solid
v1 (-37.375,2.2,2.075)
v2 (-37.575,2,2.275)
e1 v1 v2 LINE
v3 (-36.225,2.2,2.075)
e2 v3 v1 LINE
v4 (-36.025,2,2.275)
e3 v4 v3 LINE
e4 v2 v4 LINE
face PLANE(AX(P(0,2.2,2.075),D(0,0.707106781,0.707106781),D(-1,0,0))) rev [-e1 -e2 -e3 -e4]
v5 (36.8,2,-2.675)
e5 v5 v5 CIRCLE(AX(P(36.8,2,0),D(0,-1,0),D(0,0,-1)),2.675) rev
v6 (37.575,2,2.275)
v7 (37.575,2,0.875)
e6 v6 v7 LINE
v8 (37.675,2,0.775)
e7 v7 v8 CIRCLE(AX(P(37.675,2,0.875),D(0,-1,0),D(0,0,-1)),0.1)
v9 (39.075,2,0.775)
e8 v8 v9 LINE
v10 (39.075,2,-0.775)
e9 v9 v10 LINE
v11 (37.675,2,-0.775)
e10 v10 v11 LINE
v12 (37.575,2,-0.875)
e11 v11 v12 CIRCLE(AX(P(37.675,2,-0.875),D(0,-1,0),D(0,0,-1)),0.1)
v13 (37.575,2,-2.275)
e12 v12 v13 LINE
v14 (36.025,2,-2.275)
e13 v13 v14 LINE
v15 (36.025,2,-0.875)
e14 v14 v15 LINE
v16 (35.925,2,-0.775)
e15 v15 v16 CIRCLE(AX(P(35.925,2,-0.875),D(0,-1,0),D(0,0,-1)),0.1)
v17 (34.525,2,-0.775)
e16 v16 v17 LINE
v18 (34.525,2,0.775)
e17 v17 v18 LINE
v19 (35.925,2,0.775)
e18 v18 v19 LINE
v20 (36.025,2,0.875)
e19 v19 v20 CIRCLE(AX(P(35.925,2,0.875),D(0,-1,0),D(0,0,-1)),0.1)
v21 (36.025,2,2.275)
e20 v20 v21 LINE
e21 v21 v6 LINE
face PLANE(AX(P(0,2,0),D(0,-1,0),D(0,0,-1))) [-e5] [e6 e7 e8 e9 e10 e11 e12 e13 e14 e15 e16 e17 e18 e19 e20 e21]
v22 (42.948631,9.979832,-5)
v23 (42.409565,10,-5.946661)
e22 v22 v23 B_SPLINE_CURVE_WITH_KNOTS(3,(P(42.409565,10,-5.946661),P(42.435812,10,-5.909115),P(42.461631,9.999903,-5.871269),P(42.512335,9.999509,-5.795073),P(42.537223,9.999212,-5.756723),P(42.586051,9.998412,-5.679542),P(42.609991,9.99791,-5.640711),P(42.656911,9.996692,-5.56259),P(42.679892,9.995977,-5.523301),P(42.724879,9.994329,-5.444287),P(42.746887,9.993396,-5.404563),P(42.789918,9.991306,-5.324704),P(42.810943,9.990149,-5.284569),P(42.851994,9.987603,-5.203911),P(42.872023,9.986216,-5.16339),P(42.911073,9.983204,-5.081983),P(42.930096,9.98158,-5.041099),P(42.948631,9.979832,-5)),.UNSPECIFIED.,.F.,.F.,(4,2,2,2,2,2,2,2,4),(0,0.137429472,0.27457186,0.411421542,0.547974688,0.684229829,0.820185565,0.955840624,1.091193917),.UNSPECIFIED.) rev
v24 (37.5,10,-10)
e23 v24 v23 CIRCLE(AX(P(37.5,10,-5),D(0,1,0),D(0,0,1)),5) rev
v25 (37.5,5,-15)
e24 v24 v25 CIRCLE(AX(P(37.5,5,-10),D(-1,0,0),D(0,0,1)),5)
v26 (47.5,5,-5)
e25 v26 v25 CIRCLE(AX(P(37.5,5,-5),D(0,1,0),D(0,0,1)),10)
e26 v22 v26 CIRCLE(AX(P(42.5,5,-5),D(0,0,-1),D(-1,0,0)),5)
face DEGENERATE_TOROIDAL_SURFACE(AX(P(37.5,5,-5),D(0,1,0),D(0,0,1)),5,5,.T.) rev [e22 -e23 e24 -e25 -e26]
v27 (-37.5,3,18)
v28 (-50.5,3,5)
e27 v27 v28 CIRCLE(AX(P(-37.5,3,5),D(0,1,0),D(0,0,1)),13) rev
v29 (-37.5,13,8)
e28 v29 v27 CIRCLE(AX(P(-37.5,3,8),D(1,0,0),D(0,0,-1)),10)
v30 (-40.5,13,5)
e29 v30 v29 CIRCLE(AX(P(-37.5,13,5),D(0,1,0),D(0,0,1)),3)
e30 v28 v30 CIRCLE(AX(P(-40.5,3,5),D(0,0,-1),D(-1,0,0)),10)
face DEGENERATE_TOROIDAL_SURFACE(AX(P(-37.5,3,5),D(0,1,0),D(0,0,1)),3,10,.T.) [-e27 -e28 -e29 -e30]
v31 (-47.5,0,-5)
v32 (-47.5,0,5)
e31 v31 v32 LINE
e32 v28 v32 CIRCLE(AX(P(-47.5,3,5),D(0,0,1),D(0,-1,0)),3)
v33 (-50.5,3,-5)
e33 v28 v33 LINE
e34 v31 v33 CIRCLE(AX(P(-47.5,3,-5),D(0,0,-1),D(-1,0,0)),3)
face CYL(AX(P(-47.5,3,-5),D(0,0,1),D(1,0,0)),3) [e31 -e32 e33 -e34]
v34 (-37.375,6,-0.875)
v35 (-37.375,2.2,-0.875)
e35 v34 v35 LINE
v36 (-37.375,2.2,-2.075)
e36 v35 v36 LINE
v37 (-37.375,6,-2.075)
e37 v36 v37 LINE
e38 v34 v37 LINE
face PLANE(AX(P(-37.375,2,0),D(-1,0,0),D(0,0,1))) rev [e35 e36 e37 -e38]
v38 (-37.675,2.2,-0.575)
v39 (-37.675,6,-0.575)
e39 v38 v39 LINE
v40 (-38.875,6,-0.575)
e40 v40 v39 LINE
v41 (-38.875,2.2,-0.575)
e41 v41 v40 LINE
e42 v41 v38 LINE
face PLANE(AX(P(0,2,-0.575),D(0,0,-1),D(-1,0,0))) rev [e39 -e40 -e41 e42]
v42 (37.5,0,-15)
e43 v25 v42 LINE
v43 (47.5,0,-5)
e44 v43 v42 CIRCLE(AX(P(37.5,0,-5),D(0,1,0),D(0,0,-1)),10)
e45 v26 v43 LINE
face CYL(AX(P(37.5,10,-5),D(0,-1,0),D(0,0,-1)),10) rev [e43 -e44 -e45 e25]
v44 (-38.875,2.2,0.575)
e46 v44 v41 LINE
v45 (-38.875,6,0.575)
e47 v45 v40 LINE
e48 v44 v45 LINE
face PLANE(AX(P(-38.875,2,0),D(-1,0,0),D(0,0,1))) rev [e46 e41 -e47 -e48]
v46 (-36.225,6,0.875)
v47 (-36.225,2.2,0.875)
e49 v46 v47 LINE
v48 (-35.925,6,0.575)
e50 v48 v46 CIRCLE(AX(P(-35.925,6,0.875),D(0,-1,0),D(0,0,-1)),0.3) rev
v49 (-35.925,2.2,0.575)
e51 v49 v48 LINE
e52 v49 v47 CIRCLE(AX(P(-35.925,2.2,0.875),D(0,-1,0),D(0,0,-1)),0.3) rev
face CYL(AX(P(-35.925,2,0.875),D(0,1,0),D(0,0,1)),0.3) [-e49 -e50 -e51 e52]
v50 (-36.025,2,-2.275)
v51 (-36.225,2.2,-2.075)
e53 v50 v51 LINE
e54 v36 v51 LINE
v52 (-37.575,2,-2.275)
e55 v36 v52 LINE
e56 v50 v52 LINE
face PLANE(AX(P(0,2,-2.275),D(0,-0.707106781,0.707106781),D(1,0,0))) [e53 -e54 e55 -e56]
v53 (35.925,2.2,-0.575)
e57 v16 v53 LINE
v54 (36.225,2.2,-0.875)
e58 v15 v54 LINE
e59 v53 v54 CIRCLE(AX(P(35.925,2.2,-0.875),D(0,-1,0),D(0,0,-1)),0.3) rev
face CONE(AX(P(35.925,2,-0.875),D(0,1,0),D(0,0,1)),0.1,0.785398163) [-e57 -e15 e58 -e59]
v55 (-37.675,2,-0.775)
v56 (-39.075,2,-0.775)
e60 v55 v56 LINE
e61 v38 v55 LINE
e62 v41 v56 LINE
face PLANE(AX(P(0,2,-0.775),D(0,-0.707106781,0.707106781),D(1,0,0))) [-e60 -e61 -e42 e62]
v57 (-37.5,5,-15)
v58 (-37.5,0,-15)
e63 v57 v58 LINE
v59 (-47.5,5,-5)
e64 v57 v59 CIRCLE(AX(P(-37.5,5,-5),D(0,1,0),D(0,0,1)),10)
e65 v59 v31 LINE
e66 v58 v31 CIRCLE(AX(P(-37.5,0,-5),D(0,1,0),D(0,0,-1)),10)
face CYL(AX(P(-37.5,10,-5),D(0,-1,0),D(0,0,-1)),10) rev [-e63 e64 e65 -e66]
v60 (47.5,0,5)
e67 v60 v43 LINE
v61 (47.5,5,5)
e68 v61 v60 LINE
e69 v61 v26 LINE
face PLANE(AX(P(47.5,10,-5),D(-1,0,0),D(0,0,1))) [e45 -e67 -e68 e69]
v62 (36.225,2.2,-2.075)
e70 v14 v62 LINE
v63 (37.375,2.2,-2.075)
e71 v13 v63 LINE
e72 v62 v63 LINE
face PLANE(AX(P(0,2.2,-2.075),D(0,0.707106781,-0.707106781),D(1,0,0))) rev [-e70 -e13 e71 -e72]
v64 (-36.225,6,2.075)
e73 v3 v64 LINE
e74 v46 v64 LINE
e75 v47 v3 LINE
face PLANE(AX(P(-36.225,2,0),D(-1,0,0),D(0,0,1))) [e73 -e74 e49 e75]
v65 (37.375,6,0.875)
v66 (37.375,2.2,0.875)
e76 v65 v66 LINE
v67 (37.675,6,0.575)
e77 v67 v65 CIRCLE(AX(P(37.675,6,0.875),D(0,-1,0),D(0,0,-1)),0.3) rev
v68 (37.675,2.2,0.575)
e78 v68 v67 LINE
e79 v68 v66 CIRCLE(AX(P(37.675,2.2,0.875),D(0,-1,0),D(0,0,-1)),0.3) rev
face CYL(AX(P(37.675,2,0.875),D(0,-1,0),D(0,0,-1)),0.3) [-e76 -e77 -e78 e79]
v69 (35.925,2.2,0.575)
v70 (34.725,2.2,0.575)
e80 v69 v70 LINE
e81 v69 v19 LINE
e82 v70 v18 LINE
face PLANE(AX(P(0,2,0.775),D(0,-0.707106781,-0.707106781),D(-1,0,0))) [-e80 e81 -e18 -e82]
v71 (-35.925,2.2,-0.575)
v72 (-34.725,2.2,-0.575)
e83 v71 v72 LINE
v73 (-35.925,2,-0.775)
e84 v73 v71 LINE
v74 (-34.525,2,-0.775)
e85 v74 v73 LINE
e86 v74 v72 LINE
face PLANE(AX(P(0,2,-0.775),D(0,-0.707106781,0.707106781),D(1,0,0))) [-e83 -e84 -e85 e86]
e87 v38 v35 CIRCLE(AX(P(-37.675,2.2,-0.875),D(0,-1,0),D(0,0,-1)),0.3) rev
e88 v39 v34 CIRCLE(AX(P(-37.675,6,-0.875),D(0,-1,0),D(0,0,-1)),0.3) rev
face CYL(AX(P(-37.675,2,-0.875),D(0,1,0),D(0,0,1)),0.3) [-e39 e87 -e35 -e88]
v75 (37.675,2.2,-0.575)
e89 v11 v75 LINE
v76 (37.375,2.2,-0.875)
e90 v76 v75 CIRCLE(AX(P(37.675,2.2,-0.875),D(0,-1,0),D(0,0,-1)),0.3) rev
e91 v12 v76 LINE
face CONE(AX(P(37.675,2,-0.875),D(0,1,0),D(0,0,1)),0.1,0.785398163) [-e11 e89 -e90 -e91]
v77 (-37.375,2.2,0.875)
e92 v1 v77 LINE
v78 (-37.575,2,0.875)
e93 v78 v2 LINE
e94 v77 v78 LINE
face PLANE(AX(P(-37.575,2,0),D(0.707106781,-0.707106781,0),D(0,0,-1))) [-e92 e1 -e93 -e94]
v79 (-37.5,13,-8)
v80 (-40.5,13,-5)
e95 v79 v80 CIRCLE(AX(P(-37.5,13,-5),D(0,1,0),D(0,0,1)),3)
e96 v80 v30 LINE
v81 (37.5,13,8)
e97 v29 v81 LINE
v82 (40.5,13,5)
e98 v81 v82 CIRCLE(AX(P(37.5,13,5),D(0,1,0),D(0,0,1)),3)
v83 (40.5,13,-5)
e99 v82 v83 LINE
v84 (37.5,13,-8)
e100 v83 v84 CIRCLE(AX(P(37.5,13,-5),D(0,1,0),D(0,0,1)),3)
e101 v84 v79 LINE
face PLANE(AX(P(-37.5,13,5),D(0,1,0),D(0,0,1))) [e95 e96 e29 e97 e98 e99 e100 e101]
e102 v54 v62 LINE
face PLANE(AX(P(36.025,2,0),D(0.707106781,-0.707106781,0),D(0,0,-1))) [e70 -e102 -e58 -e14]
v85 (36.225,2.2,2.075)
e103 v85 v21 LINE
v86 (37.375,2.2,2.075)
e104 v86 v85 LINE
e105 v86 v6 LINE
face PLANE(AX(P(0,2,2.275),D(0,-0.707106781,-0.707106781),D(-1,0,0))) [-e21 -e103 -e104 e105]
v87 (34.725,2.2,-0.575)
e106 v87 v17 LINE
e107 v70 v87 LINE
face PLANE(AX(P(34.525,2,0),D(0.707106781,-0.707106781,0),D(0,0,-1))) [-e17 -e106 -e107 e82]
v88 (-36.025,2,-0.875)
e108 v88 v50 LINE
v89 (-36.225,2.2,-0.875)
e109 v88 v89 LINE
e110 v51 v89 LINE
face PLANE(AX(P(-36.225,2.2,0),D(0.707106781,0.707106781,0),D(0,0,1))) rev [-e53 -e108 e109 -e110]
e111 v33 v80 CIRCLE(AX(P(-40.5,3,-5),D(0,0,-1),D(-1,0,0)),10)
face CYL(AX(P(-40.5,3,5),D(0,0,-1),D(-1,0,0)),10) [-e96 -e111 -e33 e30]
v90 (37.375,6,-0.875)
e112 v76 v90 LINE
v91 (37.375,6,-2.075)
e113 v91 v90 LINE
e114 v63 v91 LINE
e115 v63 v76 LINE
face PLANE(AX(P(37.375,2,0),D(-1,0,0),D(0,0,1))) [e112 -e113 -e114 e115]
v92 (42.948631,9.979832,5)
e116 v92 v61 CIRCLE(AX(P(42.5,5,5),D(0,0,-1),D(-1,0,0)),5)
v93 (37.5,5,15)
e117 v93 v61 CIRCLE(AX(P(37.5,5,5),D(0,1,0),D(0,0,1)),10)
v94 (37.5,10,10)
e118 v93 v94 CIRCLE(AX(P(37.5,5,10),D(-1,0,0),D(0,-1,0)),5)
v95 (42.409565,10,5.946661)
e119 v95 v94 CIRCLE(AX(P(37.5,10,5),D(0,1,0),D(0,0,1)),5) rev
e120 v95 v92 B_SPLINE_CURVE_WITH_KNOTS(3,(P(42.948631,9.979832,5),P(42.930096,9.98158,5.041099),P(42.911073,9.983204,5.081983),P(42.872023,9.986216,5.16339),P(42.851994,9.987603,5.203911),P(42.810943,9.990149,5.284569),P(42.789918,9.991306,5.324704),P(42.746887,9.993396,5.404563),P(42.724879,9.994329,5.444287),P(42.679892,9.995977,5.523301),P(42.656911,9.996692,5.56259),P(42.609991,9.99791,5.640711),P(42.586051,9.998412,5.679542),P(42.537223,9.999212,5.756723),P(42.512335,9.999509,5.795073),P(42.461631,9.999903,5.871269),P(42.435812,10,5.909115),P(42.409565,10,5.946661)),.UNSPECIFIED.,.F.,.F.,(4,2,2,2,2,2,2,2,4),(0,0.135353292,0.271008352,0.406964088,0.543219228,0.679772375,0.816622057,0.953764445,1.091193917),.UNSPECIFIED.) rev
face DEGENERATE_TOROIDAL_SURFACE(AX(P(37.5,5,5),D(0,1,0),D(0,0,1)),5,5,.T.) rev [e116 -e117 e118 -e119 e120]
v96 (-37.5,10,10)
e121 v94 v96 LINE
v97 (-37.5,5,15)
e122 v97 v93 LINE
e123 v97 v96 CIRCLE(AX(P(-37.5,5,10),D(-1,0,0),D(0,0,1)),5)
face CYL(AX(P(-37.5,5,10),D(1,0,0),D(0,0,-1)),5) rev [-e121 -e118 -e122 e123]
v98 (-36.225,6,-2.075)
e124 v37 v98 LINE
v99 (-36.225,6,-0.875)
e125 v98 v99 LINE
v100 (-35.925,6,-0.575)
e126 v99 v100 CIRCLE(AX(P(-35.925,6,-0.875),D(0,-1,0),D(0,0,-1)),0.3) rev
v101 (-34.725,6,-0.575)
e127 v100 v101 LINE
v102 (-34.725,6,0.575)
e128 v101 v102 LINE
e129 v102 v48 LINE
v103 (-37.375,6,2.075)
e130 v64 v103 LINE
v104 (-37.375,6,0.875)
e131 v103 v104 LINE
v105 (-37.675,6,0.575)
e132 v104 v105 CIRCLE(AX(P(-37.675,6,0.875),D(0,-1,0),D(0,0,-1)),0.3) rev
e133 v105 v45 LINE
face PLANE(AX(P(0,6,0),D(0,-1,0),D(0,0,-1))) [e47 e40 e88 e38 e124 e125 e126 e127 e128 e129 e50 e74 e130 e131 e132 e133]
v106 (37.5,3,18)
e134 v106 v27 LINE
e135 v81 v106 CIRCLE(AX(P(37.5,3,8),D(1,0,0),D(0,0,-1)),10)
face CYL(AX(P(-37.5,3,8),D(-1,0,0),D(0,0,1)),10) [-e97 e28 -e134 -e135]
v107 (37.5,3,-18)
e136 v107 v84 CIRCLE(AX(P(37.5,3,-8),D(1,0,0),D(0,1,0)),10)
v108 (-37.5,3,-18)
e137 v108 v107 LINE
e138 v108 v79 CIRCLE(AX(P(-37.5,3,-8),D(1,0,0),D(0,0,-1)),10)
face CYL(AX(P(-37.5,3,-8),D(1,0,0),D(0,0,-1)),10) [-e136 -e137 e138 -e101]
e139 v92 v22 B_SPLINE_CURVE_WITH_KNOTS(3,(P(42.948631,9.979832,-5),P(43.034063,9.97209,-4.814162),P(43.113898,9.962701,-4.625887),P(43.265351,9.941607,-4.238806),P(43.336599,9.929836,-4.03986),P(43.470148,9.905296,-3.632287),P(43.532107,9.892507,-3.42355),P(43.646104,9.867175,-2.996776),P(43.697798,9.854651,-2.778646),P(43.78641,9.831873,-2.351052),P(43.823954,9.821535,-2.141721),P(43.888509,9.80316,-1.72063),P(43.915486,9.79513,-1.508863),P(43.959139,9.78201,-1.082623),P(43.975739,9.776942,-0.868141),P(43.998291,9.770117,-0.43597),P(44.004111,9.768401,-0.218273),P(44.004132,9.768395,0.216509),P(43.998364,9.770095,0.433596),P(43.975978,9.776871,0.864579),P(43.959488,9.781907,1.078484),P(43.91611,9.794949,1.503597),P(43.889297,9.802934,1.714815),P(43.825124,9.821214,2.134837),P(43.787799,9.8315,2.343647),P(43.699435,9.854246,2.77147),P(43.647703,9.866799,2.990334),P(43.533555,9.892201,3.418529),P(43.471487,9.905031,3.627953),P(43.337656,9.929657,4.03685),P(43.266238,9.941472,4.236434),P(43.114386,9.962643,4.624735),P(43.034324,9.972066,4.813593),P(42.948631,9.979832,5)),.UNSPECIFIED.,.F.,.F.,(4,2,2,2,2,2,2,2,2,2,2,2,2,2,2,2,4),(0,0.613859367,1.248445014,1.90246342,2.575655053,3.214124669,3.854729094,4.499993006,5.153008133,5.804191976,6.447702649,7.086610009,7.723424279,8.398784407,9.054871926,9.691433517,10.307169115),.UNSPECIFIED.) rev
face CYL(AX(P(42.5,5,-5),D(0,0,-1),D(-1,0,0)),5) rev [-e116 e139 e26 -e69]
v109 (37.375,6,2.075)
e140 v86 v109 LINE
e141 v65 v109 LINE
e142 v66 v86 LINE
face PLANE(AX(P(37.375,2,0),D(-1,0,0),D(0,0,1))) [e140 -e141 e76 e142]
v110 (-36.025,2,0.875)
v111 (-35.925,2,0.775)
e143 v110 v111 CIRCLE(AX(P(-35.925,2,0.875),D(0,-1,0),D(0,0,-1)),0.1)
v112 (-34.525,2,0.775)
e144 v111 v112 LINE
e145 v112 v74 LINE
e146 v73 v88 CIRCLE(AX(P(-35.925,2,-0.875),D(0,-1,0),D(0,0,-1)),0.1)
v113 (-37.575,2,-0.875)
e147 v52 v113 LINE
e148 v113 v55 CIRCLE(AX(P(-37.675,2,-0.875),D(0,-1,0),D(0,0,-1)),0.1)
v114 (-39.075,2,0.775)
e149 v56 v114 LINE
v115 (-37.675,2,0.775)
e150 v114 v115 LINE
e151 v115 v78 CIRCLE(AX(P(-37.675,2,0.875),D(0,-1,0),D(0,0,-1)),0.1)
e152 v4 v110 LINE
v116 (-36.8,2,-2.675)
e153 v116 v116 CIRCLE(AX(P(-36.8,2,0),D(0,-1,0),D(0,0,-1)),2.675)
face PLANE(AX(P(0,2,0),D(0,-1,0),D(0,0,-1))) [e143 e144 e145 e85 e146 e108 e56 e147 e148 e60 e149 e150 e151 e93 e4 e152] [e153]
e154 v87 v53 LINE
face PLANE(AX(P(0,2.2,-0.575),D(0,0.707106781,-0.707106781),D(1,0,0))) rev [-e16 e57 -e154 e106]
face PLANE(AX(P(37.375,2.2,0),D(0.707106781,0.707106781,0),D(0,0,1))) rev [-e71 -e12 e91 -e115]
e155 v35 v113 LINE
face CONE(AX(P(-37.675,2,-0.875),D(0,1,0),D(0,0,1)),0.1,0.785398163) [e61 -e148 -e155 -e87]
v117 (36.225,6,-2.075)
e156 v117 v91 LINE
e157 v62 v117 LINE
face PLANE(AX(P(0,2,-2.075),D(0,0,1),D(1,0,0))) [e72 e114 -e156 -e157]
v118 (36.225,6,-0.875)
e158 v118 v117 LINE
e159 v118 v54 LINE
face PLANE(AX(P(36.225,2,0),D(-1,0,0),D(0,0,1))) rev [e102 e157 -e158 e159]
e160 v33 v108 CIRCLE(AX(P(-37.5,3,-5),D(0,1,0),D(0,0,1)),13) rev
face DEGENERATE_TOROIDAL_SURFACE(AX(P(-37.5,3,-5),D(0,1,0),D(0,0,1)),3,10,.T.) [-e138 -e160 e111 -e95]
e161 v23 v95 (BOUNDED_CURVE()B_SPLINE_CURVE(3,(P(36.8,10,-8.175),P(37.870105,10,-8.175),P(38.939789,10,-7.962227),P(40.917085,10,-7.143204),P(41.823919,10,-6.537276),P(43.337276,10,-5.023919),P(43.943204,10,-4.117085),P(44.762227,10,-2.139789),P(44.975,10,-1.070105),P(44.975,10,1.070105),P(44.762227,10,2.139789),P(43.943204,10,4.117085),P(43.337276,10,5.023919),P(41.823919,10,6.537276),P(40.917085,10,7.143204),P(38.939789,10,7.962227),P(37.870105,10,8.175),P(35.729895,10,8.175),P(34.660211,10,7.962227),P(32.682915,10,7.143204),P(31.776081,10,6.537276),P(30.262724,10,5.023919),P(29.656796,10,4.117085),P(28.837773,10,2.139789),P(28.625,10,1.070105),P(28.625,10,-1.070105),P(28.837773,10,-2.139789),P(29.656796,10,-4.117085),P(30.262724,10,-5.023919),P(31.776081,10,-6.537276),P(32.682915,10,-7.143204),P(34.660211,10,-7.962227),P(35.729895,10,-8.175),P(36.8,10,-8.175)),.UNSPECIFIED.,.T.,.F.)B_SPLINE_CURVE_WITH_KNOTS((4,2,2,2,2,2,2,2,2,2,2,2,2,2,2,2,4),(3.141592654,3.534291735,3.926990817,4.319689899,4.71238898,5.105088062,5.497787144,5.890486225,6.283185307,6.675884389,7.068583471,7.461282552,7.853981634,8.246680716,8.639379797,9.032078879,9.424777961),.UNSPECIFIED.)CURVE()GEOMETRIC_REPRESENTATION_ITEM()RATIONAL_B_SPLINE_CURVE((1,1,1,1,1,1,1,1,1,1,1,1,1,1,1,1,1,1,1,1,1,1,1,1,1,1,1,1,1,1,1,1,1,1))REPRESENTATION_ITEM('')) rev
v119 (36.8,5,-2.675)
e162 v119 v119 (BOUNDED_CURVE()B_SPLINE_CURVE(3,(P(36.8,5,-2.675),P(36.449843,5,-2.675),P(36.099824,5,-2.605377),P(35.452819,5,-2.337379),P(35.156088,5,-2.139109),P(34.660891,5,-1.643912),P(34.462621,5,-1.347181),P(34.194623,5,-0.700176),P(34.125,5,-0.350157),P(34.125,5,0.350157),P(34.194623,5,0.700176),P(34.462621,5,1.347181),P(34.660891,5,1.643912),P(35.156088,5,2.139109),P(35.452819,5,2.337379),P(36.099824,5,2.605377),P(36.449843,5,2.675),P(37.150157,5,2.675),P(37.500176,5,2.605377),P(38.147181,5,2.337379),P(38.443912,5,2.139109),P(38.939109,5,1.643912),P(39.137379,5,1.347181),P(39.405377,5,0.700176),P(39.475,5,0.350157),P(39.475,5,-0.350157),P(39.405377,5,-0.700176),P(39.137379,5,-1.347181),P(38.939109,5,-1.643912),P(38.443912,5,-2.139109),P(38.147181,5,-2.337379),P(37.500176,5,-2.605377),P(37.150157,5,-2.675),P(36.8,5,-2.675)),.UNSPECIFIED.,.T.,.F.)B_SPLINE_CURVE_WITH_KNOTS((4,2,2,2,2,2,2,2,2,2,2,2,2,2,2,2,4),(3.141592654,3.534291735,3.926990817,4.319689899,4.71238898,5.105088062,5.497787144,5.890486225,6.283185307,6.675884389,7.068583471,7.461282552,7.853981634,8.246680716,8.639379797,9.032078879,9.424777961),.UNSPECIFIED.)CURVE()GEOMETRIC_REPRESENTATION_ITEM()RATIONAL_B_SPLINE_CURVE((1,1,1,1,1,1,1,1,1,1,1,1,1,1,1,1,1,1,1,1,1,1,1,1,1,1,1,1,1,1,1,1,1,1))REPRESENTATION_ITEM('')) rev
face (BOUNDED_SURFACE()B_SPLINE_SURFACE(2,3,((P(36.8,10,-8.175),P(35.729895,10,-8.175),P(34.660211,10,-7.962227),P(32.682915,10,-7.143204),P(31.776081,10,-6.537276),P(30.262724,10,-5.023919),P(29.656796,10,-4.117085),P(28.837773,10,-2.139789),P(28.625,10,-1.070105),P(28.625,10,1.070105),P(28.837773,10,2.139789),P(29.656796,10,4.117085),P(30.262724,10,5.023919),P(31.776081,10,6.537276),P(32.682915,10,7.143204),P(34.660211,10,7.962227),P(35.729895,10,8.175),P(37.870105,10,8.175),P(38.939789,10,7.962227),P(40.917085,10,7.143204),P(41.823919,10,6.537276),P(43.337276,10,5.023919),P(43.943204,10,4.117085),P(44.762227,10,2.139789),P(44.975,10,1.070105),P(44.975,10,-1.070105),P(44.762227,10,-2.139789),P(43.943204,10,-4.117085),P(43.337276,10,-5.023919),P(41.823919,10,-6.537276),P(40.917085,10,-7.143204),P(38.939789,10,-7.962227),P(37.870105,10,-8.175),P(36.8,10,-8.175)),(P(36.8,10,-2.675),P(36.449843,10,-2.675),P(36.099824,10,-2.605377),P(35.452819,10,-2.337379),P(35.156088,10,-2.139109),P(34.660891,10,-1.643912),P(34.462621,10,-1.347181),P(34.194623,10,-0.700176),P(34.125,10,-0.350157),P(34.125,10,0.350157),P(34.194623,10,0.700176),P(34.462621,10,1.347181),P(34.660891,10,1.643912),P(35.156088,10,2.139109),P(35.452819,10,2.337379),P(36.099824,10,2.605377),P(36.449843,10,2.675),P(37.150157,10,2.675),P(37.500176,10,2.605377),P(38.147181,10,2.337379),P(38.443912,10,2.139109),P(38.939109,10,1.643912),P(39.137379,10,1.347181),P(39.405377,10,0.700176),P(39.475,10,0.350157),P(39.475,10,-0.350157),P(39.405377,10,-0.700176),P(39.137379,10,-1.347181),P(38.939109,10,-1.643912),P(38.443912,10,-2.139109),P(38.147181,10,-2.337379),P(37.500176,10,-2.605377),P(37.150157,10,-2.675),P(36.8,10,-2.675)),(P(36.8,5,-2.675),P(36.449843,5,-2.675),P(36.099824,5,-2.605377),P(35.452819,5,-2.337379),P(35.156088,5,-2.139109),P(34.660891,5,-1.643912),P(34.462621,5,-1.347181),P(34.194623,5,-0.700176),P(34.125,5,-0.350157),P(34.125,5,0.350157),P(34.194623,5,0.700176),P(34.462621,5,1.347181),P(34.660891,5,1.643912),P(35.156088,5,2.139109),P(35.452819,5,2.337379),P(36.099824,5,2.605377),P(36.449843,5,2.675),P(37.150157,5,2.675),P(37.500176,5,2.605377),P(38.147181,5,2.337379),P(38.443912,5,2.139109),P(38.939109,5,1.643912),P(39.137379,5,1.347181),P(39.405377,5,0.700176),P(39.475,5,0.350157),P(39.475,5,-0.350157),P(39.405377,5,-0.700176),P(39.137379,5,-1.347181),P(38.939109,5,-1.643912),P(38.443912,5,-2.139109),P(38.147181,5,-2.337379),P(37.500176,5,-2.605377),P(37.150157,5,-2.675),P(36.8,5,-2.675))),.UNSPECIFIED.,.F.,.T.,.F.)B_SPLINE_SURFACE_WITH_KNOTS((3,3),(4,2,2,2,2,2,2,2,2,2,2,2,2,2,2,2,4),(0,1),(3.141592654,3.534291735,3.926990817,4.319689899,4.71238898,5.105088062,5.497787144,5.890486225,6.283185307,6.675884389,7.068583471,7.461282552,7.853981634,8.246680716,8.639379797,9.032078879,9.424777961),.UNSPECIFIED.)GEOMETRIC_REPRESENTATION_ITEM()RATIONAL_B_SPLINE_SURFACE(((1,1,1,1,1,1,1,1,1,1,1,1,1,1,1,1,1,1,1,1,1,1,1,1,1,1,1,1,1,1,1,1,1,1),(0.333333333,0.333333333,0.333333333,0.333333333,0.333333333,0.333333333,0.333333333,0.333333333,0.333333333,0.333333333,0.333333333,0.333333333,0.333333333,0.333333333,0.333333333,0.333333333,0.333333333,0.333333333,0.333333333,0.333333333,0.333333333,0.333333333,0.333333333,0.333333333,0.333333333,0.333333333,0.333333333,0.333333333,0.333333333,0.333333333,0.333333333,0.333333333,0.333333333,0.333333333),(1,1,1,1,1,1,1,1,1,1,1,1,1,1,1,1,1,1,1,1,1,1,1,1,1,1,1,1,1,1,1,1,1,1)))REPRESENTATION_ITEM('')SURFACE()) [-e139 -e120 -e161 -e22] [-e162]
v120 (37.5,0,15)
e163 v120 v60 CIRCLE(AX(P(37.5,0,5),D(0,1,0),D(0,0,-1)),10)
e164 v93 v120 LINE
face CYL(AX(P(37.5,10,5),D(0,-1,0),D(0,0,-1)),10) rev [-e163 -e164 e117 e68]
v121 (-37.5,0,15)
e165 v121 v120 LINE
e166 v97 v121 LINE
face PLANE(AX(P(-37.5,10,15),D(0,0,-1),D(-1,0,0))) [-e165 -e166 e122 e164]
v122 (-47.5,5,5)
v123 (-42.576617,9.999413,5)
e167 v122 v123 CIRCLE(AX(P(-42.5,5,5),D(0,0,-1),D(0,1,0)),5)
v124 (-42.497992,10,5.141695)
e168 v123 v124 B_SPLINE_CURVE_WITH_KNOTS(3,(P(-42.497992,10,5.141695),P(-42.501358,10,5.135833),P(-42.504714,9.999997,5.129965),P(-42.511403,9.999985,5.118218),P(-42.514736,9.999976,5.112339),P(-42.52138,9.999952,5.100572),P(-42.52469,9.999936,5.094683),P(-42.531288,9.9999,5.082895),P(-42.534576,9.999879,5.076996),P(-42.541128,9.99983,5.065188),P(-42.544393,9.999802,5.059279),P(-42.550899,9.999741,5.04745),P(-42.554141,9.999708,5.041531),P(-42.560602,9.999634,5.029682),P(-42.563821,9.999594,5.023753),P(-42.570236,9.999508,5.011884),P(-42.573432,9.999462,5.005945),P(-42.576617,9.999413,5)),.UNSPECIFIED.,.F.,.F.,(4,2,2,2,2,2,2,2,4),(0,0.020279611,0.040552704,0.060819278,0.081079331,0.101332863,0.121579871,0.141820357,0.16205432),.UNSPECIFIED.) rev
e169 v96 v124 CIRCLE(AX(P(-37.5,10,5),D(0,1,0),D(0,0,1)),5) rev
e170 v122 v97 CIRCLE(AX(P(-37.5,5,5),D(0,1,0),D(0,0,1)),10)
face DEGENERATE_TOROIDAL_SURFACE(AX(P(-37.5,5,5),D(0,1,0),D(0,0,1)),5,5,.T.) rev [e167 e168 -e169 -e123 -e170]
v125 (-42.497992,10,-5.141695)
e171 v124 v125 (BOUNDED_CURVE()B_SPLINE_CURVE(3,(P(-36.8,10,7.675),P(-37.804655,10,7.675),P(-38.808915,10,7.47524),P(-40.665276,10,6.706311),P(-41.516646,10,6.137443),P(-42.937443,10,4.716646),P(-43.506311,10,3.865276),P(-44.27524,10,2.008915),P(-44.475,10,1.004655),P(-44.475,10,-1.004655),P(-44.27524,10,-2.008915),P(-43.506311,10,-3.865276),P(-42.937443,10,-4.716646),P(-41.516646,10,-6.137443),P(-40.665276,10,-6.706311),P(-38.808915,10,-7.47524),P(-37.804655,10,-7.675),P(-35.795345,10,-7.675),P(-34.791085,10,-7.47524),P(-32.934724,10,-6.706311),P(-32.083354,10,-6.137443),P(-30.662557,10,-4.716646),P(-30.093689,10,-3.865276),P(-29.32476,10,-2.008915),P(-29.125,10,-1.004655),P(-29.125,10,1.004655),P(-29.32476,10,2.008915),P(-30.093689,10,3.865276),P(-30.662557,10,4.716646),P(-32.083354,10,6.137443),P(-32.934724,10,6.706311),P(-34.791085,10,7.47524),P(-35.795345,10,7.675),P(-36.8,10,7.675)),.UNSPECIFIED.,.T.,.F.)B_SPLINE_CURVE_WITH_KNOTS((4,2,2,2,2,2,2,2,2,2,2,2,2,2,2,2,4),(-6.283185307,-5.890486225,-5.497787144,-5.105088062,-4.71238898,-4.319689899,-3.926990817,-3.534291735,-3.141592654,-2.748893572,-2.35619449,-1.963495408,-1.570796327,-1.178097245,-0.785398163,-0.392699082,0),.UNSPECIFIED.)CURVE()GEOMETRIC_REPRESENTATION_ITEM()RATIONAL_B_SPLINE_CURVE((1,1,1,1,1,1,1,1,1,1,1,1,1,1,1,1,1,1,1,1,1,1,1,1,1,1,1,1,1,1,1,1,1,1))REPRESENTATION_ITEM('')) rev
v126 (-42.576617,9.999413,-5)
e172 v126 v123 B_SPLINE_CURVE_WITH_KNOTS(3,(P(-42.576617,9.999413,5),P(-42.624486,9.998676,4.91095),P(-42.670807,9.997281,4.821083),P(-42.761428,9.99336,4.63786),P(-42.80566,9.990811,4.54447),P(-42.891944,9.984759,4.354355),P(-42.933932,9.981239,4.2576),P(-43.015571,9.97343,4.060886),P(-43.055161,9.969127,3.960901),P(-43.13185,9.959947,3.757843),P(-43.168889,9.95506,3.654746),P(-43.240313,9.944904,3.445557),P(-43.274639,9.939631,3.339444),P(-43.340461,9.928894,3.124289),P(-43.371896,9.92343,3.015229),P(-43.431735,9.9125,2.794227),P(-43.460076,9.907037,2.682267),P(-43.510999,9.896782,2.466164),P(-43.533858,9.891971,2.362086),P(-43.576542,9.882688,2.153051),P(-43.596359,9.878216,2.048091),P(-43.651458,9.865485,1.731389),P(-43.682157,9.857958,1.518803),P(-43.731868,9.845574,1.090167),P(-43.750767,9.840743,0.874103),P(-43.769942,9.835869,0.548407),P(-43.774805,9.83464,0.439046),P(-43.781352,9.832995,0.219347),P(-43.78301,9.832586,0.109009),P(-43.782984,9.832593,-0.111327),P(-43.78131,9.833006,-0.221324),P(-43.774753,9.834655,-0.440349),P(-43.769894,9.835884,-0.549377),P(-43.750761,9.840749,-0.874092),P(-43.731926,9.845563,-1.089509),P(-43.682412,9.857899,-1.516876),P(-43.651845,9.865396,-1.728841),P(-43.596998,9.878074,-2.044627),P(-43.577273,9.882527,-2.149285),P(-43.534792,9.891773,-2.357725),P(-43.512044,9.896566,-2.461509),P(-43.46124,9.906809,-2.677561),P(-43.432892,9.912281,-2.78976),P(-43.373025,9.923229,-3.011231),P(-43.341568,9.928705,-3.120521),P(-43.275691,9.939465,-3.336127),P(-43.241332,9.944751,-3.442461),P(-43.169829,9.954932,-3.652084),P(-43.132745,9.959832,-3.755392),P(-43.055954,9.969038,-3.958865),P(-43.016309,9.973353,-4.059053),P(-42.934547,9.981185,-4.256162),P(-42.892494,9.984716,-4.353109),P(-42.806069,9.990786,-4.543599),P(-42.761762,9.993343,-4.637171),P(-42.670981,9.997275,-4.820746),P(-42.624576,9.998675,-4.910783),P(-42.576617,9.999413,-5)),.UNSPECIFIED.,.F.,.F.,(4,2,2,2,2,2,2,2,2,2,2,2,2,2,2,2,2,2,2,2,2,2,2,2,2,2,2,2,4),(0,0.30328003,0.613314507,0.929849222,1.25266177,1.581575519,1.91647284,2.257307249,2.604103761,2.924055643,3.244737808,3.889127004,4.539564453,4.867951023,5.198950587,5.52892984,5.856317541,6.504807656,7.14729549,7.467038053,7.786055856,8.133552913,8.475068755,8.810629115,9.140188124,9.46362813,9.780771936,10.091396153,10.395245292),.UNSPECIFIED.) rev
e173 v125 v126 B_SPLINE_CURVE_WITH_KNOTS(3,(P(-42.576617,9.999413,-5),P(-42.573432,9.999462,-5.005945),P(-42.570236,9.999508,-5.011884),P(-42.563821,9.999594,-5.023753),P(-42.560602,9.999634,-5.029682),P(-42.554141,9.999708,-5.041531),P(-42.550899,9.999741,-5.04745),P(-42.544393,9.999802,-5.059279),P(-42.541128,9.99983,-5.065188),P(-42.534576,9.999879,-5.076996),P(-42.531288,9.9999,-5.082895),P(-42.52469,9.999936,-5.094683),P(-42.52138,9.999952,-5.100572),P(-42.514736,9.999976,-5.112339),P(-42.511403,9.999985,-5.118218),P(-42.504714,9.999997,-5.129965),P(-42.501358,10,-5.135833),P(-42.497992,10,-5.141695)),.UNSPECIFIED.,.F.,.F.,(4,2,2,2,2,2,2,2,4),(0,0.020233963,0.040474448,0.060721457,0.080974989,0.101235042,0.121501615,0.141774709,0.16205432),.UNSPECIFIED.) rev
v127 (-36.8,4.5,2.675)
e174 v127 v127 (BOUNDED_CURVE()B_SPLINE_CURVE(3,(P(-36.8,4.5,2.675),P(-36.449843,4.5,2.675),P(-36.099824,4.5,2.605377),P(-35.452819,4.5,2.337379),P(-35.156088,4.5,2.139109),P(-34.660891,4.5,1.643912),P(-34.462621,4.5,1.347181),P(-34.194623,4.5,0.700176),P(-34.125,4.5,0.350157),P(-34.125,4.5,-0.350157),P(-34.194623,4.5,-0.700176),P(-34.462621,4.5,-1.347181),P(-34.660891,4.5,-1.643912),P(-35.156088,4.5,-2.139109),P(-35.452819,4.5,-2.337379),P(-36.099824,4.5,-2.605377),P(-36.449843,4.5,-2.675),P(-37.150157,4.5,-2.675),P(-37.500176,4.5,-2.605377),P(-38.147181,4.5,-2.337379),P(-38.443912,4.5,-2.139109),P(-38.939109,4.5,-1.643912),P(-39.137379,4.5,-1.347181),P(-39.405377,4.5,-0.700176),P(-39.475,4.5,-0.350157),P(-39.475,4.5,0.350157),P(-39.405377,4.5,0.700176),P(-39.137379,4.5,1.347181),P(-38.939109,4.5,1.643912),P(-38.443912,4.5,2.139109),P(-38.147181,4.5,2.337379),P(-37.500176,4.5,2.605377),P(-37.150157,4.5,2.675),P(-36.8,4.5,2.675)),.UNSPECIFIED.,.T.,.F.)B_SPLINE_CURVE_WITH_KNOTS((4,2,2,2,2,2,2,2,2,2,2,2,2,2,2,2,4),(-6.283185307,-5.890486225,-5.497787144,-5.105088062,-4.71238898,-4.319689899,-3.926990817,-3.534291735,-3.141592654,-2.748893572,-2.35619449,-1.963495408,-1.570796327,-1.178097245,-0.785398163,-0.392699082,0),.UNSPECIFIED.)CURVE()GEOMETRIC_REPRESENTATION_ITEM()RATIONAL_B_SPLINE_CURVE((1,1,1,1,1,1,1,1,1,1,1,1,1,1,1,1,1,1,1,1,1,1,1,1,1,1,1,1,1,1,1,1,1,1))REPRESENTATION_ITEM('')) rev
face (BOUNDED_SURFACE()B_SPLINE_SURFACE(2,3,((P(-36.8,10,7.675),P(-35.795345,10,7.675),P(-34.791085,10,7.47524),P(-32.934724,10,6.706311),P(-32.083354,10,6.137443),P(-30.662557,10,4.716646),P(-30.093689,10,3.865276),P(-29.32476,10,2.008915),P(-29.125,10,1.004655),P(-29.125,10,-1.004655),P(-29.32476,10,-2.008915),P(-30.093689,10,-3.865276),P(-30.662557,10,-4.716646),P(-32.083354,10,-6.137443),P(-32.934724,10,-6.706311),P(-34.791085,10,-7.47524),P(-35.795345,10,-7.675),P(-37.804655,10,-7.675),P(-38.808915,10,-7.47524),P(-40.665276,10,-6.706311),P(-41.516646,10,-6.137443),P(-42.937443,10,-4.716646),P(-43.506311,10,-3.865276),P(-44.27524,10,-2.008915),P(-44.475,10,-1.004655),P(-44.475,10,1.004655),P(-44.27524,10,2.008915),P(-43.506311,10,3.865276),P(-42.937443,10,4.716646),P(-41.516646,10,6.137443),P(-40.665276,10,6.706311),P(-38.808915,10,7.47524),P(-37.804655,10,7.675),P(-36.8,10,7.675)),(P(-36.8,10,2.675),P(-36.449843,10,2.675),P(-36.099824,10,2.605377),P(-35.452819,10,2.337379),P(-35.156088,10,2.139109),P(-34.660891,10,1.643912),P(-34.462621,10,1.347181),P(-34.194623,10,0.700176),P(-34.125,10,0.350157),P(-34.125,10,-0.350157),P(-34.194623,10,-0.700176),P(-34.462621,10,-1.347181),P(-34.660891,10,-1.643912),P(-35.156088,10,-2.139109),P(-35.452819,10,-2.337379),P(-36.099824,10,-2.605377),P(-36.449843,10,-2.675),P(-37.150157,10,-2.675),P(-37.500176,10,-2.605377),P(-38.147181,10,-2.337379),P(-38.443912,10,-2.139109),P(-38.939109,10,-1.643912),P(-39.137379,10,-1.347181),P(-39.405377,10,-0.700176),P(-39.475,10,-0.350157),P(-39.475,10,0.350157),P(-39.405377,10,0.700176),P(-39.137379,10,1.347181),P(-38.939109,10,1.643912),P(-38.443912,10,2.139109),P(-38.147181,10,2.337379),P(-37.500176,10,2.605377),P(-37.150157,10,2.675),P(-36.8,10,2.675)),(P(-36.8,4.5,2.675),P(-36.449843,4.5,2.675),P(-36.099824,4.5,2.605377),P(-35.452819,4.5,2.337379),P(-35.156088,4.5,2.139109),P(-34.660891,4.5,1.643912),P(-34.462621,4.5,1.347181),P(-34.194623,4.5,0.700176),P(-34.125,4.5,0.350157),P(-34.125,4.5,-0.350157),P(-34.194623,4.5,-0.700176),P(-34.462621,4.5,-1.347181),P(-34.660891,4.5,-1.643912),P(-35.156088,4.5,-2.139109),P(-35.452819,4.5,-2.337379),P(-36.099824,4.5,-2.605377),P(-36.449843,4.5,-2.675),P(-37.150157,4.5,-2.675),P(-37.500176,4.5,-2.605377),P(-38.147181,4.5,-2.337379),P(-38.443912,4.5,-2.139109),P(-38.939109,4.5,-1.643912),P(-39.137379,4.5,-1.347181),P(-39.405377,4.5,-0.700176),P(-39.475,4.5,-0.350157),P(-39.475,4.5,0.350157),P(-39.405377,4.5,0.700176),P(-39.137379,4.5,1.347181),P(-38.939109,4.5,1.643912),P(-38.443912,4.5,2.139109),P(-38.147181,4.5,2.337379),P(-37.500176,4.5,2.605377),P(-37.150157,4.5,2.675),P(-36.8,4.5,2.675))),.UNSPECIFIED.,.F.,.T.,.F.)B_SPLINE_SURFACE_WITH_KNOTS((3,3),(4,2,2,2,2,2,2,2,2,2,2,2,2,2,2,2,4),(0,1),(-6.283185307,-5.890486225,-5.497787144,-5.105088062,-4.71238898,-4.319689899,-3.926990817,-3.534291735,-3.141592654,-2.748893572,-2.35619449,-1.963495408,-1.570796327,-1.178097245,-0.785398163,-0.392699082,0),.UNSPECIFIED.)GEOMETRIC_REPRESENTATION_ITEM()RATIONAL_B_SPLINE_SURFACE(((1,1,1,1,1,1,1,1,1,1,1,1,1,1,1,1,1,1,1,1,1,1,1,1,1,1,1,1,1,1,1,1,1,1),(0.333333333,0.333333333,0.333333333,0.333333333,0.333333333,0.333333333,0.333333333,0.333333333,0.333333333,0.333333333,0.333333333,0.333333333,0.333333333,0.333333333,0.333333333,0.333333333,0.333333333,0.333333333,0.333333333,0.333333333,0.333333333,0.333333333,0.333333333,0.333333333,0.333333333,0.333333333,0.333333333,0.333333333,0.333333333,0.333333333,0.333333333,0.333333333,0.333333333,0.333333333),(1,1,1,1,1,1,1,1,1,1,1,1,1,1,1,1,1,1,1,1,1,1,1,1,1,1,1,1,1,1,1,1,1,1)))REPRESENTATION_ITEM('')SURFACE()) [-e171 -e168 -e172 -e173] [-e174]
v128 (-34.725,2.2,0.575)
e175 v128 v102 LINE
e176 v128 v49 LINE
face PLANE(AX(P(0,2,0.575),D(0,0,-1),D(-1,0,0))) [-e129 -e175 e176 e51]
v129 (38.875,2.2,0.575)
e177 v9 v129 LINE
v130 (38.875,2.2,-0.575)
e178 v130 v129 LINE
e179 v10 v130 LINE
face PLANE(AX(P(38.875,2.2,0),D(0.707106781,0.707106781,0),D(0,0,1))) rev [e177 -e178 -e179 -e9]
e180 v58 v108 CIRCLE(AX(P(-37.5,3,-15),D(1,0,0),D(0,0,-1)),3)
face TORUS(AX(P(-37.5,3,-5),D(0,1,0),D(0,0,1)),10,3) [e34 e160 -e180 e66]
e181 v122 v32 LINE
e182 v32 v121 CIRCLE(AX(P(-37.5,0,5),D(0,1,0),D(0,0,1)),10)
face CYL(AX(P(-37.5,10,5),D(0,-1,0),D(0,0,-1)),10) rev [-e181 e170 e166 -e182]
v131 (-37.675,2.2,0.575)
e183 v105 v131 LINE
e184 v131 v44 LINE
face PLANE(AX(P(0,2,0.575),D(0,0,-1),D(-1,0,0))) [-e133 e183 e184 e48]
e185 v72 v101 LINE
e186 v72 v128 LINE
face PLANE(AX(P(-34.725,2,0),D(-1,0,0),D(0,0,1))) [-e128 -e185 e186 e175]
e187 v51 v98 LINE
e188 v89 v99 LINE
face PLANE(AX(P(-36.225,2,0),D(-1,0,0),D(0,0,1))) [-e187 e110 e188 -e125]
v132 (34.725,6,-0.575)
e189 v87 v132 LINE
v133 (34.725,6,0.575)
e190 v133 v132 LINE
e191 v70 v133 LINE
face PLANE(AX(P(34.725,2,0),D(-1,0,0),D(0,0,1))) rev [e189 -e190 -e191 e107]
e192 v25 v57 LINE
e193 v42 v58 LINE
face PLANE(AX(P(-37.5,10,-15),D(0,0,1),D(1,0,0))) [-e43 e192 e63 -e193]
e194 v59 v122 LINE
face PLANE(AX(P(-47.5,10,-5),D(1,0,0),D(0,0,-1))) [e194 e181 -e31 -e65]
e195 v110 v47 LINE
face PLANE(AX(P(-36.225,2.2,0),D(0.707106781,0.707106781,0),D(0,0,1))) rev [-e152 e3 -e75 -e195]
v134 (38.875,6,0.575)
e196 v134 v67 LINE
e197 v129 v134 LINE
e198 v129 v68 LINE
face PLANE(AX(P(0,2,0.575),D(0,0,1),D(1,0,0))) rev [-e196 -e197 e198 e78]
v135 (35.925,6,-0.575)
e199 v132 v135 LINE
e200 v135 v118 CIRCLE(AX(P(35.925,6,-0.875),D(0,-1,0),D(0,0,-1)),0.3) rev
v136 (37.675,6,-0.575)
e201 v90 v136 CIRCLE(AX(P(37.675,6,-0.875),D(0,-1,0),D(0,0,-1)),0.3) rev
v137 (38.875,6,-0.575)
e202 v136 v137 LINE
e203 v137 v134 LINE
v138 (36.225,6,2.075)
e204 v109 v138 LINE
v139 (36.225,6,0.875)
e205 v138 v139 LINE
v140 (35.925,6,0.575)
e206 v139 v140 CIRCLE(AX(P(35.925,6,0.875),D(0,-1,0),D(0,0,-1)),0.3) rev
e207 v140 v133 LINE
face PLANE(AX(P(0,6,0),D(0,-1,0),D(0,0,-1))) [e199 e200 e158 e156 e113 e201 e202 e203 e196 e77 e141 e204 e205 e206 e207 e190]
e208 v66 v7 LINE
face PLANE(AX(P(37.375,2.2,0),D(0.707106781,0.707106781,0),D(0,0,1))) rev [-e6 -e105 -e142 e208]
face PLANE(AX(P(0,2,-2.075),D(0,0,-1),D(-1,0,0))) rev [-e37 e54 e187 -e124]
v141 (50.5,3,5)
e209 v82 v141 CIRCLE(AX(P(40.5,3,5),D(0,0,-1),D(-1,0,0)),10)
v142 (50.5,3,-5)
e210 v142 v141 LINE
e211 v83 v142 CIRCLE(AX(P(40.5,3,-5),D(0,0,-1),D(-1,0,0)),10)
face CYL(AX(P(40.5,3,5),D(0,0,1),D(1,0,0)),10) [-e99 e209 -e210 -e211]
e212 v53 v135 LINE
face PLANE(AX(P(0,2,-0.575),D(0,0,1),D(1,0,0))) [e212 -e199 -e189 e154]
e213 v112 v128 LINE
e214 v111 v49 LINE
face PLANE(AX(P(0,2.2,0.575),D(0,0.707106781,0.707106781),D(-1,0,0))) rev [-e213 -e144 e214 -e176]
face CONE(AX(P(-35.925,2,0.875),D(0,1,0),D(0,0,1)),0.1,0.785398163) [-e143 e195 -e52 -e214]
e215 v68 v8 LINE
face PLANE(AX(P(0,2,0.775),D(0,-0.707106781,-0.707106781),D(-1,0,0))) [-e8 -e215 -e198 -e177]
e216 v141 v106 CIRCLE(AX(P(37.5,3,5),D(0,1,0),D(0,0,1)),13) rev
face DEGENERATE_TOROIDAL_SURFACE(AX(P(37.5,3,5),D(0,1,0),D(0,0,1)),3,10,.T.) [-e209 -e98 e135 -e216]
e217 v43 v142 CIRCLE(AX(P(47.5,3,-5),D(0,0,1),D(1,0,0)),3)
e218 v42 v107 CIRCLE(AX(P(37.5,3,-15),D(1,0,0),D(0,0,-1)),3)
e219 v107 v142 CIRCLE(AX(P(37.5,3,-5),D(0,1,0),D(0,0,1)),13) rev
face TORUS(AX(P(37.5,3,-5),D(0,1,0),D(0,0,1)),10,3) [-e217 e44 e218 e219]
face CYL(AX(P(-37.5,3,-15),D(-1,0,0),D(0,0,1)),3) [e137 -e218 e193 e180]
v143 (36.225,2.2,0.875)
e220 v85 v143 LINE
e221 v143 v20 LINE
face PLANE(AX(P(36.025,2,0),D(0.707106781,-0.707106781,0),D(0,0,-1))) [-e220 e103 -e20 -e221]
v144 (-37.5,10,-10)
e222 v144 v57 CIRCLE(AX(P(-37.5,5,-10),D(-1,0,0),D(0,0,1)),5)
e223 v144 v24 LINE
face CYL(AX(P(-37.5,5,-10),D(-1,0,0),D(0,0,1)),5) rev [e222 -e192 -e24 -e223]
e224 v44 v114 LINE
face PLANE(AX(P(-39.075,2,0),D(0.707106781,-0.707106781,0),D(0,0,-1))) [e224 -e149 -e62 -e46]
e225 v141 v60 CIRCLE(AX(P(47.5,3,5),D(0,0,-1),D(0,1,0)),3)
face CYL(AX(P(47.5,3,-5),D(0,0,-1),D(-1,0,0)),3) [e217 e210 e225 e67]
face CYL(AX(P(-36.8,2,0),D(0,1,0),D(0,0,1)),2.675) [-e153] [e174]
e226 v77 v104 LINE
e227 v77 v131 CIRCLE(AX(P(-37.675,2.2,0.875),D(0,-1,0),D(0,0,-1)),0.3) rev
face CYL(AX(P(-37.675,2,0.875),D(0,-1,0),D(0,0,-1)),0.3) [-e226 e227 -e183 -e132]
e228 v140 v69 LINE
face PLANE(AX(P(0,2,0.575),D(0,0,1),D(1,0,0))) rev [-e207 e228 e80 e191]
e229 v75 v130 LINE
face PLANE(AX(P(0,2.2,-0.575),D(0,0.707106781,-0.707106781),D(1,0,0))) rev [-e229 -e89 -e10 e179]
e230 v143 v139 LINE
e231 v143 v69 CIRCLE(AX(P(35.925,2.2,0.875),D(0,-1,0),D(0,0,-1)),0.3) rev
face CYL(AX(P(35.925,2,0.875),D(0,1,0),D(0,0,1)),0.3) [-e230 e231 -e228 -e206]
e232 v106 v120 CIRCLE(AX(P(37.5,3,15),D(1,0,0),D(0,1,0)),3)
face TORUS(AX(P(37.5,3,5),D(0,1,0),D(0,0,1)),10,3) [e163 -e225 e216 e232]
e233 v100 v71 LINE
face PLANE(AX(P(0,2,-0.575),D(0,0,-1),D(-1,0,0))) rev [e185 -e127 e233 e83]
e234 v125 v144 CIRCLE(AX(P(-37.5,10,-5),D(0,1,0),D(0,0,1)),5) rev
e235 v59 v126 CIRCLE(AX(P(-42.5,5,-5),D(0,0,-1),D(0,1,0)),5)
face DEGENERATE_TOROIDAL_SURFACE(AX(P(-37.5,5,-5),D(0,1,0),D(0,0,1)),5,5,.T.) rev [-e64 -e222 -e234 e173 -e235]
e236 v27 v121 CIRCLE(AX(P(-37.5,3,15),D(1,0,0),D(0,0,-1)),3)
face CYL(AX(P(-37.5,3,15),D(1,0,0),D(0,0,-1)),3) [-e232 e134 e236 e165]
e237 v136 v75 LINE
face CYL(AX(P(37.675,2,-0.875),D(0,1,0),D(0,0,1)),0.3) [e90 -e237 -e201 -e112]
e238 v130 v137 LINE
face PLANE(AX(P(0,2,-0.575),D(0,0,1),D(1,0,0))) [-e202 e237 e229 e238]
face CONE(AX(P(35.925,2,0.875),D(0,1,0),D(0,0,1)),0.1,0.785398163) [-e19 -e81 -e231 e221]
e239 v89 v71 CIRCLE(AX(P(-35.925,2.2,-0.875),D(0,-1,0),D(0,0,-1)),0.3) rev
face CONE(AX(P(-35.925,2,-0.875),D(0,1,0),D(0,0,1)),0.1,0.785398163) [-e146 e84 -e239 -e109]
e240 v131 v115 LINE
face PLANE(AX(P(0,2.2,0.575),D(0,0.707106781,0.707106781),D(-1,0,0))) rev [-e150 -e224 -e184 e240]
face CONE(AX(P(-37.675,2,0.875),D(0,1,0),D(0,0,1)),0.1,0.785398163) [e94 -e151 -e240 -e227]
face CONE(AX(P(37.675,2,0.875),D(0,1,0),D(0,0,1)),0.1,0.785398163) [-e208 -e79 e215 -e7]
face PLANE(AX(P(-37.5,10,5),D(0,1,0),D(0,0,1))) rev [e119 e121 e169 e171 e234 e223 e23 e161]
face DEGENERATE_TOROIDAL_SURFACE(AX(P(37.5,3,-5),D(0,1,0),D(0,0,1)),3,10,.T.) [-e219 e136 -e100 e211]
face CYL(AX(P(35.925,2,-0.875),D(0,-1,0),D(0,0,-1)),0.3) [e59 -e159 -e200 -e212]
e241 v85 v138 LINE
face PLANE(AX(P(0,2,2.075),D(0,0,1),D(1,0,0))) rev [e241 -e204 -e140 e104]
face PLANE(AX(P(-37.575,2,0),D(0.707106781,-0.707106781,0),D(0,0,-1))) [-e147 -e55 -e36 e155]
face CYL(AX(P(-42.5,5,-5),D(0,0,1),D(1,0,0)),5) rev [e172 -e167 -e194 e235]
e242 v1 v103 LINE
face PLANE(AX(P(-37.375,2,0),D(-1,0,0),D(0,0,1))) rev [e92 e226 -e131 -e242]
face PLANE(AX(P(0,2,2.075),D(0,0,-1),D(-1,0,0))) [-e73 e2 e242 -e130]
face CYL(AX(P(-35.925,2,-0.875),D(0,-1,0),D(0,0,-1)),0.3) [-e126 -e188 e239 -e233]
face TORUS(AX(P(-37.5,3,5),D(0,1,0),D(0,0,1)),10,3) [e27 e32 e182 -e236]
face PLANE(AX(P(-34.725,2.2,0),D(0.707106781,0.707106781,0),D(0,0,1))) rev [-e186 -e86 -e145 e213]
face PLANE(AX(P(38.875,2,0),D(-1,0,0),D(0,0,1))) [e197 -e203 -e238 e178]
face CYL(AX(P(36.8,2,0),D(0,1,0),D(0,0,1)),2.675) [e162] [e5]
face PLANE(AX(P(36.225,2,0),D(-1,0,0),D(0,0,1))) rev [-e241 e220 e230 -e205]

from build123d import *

# Parameters (mm, degrees)
EXTRUDE_1_DEPTH = 10
SHELL_2_T       = 3
FILLET_3_R      = 10
FILLET_4_R      = 3
SKETCH_2_R      = 2.675
EXTRUDE_2_DEPTH = 8
EXTRUDE_3_DEPTH = 4
FILLET_11_R     = 0.3
FILLET_7_R      = 5
CHAMFER_1_SIZE  = 0.2
CHAMFER_2_SIZE  = 0.2
FILLET_9_SIZE   = 5.5
FILLET_9_SIZE_2 = 5


# Some blends are built 0.0001 mm under size
with BuildPart() as part:
    # 草图1 → 凸台-拉伸1 (new body)
    with BuildSketch(Plane(origin=(0, 0, 0), x_dir=(1, 0, 0), z_dir=(0, 1, 0))):
        with BuildLine():
            Line((-37.5, 15), (37.5, 15))
            ThreePointArc((37.5, 15), (44.571067812, 12.071067812), (47.5, 5))
            Line((47.5, 5), (47.5, -5))
            ThreePointArc((47.5, -5), (44.571067812, -12.071067812), (37.5, -15))
            Line((37.5, -15), (-37.5, -15))
            ThreePointArc((-37.5, -15), (-44.571067812, -12.071067812), (-47.5, -5))
            Line((-47.5, -5), (-47.5, 5))
            ThreePointArc((-47.5, 5), (-44.571067812, 12.071067812), (-37.5, 15))
        make_face()
    extrude(amount=EXTRUDE_1_DEPTH)

    # 抽壳2
    shell_2_openings = [part.faces().sort_by_distance(p)[0] for p in [
        (0, 0, 0),
    ]]
    offset(amount=SHELL_2_T, openings=shell_2_openings, kind=Kind.INTERSECTION)

    # 圆角3
    # the kernel refuses this fillet: 10 mm, written as the material it takes off along each edge
    with BuildSketch(Plane(origin=(37.5, 13, 5), x_dir=(1, 0, 0), z_dir=(0, 0, -1))) as fillet_3_piece_1:
        with BuildLine():
            CenterArc((13 - FILLET_3_R, FILLET_3_R), FILLET_3_R, 270, 90)
            Line((13 - FILLET_3_R, 0), (13, 0))
            Line((13, 0), (13, FILLET_3_R))
        make_face()
    revolve(axis=Axis((37.5, 13, 5), (0, -1, 0)), revolution_arc=90, mode=Mode.SUBTRACT)
    with BuildSketch(Plane(origin=(50.5, 13, 5), x_dir=(0, -1, 0), z_dir=(0, 0, -1)), Plane(origin=(-50.5, 13, -5), x_dir=(0, -1, 0), z_dir=(0, 0, 1))) as fillet_3_piece_2:
        with BuildLine():
            CenterArc((FILLET_3_R, FILLET_3_R), FILLET_3_R, 180, 90)
            Line((0, FILLET_3_R), (0, 0))
            Line((0, 0), (FILLET_3_R, 0))
        make_face()
    extrude(amount=10, mode=Mode.SUBTRACT)
    with BuildSketch(Plane(origin=(37.5, 13, -5), x_dir=(0, 0, -1), z_dir=(-1, 0, 0))) as fillet_3_piece_3:
        with BuildLine():
            CenterArc((13 - FILLET_3_R, FILLET_3_R), FILLET_3_R, 270, 90)
            Line((13 - FILLET_3_R, 0), (13, 0))
            Line((13, 0), (13, FILLET_3_R))
        make_face()
    revolve(axis=Axis((37.5, 13, -5), (0, -1, 0)), revolution_arc=90, mode=Mode.SUBTRACT)
    with BuildSketch(Plane(origin=(37.5, 13, -18), x_dir=(0, -1, 0), z_dir=(-1, 0, 0)), Plane(origin=(-37.5, 13, 18), x_dir=(0, -1, 0), z_dir=(1, 0, 0))) as fillet_3_piece_4:
        with BuildLine():
            CenterArc((FILLET_3_R, FILLET_3_R), FILLET_3_R, 180, 90)
            Line((0, FILLET_3_R), (0, 0))
            Line((0, 0), (FILLET_3_R, 0))
        make_face()
    extrude(amount=75, mode=Mode.SUBTRACT)
    with BuildSketch(Plane(origin=(-37.5, 13, -5), x_dir=(-1, 0, 0), z_dir=(0, 0, 1))) as fillet_3_piece_5:
        with BuildLine():
            CenterArc((13 - FILLET_3_R, FILLET_3_R), FILLET_3_R, 270, 90)
            Line((13 - FILLET_3_R, 0), (13, 0))
            Line((13, 0), (13, FILLET_3_R))
        make_face()
    revolve(axis=Axis((-37.5, 13, -5), (0, -1, 0)), revolution_arc=90, mode=Mode.SUBTRACT)
    with BuildSketch(Plane(origin=(-37.5, 13, 5), x_dir=(0, 0, 1), z_dir=(1, 0, 0))) as fillet_3_piece_6:
        with BuildLine():
            CenterArc((13 - FILLET_3_R, FILLET_3_R), FILLET_3_R, 270, 90)
            Line((13 - FILLET_3_R, 0), (13, 0))
            Line((13, 0), (13, FILLET_3_R))
        make_face()
    revolve(axis=Axis((-37.5, 13, 5), (0, -1, 0)), revolution_arc=90, mode=Mode.SUBTRACT)

    # 圆角4
    fillet_4_edges = [part.edges().sort_by_distance(p)[0] for p in [
        (50.5, 0, 0),
        (46.692388155, 0, 14.192388155),
        (0, 0, 18),
        (-46.692388155, 0, 14.192388155),
        (-50.5, 0, 0),
        (-46.692388155, 0, -14.192388155),
        (0, 0, -18),
        (46.692388155, 0, -14.192388155),
    ]]
    fillet(fillet_4_edges, radius=FILLET_4_R - 0.0001)  # a hair under: the kernel refuses the full size

    # 草图2 → 凸台-拉伸2 (add)
    # profile 1 of 2: a face of its own
    with BuildSketch(Plane(origin=(0, 10, 0), x_dir=(-1, 0, 0), z_dir=(0, -1, 0))):
        with Locations(Location((36.8, 0, 0), (0, 0, 270))):
            Circle(SKETCH_2_R)
        Polygon((34.725, -0.575), (34.725, 0.575), (36.225, 0.575), (36.225, 2.075), (37.375, 2.075), (37.375, 0.575), (38.875, 0.575), (38.875, -0.575), (37.375, -0.575), (37.375, -2.075), (36.225, -2.075), (36.225, -0.575), align=None, mode=Mode.SUBTRACT)
    # profile 2 of 2: a face of its own
    with BuildSketch(Plane(origin=(0, 10, 0), x_dir=(-1, 0, 0), z_dir=(0, -1, 0))):
        with Locations(Location((-36.8, 0, 0), (0, 0, 90))):
            Circle(SKETCH_2_R)
        Polygon((-37.375, 0.575), (-37.375, 2.075), (-36.225, 2.075), (-36.225, 0.575), (-34.725, 0.575), (-34.725, -0.575), (-36.225, -0.575), (-36.225, -2.075), (-37.375, -2.075), (-37.375, -0.575), (-38.875, -0.575), (-38.875, 0.575), align=None, mode=Mode.SUBTRACT)
    extrude(amount=EXTRUDE_2_DEPTH)

    # 草图3 → 凸台-拉伸3 (add)
    with BuildSketch(Plane.XZ.offset(-10)):
        Polygon((-37.375, -2.075), (-36.225, -2.075), (-36.225, -0.575), (-34.725, -0.575), (-34.725, 0.575), (-36.225, 0.575), (-36.225, 2.075), (-37.375, 2.075), (-37.375, 0.575), (-38.875, 0.575), (-38.875, -0.575), (-37.375, -0.575), align=None)
        Polygon((34.725, 0.575), (34.725, -0.575), (36.225, -0.575), (36.225, -2.075), (37.375, -2.075), (37.375, -0.575), (38.875, -0.575), (38.875, 0.575), (37.375, 0.575), (37.375, 2.075), (36.225, 2.075), (36.225, 0.575), align=None)
    extrude(amount=EXTRUDE_3_DEPTH)

    # 圆角11
    fillet_11_edges = [part.edges().sort_by_distance(p)[0] for p in [
        (36.225, 4, -0.575),
        (36.225, 4, 0.575),
        (37.375, 4, 0.575),
        (37.375, 4, -0.575),
        (-37.375, 4, -0.575),
        (-37.375, 4, 0.575),
        (-36.225, 4, 0.575),
        (-36.225, 4, -0.575),
    ]]
    fillet(fillet_11_edges, radius=FILLET_11_R)

    # 圆角7
    fillet_7_edges = [part.edges().sort_by_distance(p)[0] for p in [
        (-44.571067812, 10, 12.071067812),
        (0, 10, 15),
        (44.571067812, 10, 12.071067812),
        (47.5, 10, 0),
        (44.571067812, 10, -12.071067812),
        (0, 10, -15),
        (-44.571067812, 10, -12.071067812),
        (-47.5, 10, 0),
    ]]
    fillet(fillet_7_edges, radius=FILLET_7_R)

    # 倒角1
    chamfer_1_edges = [part.edges().sort_by_distance(p)[0] for p in [
        (35.325, 2, -0.575),
        (38.875, 2, 0),
        (37.375, 2, -1.475),
        (36.8, 2, -2.075),
        (34.725, 2, 0),
        (35.325, 2, 0.575),
        (36.8, 2, 2.075),
        (36.225, 2, -1.475),
        (38.275, 2, -0.575),
        (36.225, 2, 1.475),
        (37.375, 2, 1.475),
        (38.275, 2, 0.575),
        (37.462867966, 2, 0.662867966),
        (36.137132034, 2, 0.662867966),
        (36.137132034, 2, -0.662867966),
        (37.462867966, 2, -0.662867966),
    ]]
    chamfer(chamfer_1_edges, length=CHAMFER_1_SIZE)

    # 倒角2
    chamfer_2_edges = [part.edges().sort_by_distance(p)[0] for p in [
        (-36.8, 2, -2.075),
        (-37.375, 2, -1.475),
        (-38.875, 2, 0),
        (-35.325, 2, -0.575),
        (-38.275, 2, -0.575),
        (-38.275, 2, 0.575),
        (-37.375, 2, 1.475),
        (-36.225, 2, 1.475),
        (-37.462867966, 2, 0.662867966),
        (-36.137132034, 2, 0.662867966),
        (-36.137132034, 2, -0.662867966),
        (-37.462867966, 2, -0.662867966),
        (-36.8, 2, 2.075),
        (-35.325, 2, 0.575),
        (-34.725, 2, 0),
        (-36.225, 2, -1.475),
    ]]
    chamfer(chamfer_2_edges, length=CHAMFER_2_SIZE)

    # 圆角9
    # a fillet whose section is not a circle: 5.5, 5 mm, written as the material it adds along each edge
    with BuildSketch(Plane(origin=(36.8, 10, 0), x_dir=(0, 0, -1), z_dir=(-1, 0, 0))) as fillet_9_piece_1:
        with BuildLine():
            Bezier((2.675 + FILLET_9_SIZE, 0), (2.675, 0), (2.675, FILLET_9_SIZE_2), weights=[1, 0.333333333, 1])
            Line((2.675, FILLET_9_SIZE_2), (2.675, 0))
            Line((2.675, 0), (2.675 + FILLET_9_SIZE, 0))
        make_face()
    revolve(axis=Axis((36.8, 10, 0), (0, -1, 0)))

    # 圆角10
    # a fillet whose section is not a circle: 5.5, 5 mm, written as the material it adds along each edge (its section moved 0.00015 mm through the faces so that the kernel can cut it)
    with BuildSketch(Plane(origin=(-36.8, 10, 0), x_dir=(0, 0, 1), z_dir=(1, 0, 0))) as fillet_10_piece_1:
        with BuildLine():
            Bezier((7.675, -0.00015), (2.67485, -0.00015), (2.67485, 5.5), weights=[1, 0.333333333, 1])
            Line((2.67485, 5.5), (2.56485, 5.5))
            ThreePointArc((2.56485, 5.5), (2.565, 2.75), (2.565, 0))
            Line((2.565, 0), (2.675, -0.11))
            ThreePointArc((2.675, -0.11), (5.175, -0.11), (7.675, -0.11015))
            Line((7.675, -0.11015), (7.675, -0.00015))
        make_face()
    revolve(axis=Axis((-36.8, 10, 0), (0, -1, 0)))


solid = part.part
